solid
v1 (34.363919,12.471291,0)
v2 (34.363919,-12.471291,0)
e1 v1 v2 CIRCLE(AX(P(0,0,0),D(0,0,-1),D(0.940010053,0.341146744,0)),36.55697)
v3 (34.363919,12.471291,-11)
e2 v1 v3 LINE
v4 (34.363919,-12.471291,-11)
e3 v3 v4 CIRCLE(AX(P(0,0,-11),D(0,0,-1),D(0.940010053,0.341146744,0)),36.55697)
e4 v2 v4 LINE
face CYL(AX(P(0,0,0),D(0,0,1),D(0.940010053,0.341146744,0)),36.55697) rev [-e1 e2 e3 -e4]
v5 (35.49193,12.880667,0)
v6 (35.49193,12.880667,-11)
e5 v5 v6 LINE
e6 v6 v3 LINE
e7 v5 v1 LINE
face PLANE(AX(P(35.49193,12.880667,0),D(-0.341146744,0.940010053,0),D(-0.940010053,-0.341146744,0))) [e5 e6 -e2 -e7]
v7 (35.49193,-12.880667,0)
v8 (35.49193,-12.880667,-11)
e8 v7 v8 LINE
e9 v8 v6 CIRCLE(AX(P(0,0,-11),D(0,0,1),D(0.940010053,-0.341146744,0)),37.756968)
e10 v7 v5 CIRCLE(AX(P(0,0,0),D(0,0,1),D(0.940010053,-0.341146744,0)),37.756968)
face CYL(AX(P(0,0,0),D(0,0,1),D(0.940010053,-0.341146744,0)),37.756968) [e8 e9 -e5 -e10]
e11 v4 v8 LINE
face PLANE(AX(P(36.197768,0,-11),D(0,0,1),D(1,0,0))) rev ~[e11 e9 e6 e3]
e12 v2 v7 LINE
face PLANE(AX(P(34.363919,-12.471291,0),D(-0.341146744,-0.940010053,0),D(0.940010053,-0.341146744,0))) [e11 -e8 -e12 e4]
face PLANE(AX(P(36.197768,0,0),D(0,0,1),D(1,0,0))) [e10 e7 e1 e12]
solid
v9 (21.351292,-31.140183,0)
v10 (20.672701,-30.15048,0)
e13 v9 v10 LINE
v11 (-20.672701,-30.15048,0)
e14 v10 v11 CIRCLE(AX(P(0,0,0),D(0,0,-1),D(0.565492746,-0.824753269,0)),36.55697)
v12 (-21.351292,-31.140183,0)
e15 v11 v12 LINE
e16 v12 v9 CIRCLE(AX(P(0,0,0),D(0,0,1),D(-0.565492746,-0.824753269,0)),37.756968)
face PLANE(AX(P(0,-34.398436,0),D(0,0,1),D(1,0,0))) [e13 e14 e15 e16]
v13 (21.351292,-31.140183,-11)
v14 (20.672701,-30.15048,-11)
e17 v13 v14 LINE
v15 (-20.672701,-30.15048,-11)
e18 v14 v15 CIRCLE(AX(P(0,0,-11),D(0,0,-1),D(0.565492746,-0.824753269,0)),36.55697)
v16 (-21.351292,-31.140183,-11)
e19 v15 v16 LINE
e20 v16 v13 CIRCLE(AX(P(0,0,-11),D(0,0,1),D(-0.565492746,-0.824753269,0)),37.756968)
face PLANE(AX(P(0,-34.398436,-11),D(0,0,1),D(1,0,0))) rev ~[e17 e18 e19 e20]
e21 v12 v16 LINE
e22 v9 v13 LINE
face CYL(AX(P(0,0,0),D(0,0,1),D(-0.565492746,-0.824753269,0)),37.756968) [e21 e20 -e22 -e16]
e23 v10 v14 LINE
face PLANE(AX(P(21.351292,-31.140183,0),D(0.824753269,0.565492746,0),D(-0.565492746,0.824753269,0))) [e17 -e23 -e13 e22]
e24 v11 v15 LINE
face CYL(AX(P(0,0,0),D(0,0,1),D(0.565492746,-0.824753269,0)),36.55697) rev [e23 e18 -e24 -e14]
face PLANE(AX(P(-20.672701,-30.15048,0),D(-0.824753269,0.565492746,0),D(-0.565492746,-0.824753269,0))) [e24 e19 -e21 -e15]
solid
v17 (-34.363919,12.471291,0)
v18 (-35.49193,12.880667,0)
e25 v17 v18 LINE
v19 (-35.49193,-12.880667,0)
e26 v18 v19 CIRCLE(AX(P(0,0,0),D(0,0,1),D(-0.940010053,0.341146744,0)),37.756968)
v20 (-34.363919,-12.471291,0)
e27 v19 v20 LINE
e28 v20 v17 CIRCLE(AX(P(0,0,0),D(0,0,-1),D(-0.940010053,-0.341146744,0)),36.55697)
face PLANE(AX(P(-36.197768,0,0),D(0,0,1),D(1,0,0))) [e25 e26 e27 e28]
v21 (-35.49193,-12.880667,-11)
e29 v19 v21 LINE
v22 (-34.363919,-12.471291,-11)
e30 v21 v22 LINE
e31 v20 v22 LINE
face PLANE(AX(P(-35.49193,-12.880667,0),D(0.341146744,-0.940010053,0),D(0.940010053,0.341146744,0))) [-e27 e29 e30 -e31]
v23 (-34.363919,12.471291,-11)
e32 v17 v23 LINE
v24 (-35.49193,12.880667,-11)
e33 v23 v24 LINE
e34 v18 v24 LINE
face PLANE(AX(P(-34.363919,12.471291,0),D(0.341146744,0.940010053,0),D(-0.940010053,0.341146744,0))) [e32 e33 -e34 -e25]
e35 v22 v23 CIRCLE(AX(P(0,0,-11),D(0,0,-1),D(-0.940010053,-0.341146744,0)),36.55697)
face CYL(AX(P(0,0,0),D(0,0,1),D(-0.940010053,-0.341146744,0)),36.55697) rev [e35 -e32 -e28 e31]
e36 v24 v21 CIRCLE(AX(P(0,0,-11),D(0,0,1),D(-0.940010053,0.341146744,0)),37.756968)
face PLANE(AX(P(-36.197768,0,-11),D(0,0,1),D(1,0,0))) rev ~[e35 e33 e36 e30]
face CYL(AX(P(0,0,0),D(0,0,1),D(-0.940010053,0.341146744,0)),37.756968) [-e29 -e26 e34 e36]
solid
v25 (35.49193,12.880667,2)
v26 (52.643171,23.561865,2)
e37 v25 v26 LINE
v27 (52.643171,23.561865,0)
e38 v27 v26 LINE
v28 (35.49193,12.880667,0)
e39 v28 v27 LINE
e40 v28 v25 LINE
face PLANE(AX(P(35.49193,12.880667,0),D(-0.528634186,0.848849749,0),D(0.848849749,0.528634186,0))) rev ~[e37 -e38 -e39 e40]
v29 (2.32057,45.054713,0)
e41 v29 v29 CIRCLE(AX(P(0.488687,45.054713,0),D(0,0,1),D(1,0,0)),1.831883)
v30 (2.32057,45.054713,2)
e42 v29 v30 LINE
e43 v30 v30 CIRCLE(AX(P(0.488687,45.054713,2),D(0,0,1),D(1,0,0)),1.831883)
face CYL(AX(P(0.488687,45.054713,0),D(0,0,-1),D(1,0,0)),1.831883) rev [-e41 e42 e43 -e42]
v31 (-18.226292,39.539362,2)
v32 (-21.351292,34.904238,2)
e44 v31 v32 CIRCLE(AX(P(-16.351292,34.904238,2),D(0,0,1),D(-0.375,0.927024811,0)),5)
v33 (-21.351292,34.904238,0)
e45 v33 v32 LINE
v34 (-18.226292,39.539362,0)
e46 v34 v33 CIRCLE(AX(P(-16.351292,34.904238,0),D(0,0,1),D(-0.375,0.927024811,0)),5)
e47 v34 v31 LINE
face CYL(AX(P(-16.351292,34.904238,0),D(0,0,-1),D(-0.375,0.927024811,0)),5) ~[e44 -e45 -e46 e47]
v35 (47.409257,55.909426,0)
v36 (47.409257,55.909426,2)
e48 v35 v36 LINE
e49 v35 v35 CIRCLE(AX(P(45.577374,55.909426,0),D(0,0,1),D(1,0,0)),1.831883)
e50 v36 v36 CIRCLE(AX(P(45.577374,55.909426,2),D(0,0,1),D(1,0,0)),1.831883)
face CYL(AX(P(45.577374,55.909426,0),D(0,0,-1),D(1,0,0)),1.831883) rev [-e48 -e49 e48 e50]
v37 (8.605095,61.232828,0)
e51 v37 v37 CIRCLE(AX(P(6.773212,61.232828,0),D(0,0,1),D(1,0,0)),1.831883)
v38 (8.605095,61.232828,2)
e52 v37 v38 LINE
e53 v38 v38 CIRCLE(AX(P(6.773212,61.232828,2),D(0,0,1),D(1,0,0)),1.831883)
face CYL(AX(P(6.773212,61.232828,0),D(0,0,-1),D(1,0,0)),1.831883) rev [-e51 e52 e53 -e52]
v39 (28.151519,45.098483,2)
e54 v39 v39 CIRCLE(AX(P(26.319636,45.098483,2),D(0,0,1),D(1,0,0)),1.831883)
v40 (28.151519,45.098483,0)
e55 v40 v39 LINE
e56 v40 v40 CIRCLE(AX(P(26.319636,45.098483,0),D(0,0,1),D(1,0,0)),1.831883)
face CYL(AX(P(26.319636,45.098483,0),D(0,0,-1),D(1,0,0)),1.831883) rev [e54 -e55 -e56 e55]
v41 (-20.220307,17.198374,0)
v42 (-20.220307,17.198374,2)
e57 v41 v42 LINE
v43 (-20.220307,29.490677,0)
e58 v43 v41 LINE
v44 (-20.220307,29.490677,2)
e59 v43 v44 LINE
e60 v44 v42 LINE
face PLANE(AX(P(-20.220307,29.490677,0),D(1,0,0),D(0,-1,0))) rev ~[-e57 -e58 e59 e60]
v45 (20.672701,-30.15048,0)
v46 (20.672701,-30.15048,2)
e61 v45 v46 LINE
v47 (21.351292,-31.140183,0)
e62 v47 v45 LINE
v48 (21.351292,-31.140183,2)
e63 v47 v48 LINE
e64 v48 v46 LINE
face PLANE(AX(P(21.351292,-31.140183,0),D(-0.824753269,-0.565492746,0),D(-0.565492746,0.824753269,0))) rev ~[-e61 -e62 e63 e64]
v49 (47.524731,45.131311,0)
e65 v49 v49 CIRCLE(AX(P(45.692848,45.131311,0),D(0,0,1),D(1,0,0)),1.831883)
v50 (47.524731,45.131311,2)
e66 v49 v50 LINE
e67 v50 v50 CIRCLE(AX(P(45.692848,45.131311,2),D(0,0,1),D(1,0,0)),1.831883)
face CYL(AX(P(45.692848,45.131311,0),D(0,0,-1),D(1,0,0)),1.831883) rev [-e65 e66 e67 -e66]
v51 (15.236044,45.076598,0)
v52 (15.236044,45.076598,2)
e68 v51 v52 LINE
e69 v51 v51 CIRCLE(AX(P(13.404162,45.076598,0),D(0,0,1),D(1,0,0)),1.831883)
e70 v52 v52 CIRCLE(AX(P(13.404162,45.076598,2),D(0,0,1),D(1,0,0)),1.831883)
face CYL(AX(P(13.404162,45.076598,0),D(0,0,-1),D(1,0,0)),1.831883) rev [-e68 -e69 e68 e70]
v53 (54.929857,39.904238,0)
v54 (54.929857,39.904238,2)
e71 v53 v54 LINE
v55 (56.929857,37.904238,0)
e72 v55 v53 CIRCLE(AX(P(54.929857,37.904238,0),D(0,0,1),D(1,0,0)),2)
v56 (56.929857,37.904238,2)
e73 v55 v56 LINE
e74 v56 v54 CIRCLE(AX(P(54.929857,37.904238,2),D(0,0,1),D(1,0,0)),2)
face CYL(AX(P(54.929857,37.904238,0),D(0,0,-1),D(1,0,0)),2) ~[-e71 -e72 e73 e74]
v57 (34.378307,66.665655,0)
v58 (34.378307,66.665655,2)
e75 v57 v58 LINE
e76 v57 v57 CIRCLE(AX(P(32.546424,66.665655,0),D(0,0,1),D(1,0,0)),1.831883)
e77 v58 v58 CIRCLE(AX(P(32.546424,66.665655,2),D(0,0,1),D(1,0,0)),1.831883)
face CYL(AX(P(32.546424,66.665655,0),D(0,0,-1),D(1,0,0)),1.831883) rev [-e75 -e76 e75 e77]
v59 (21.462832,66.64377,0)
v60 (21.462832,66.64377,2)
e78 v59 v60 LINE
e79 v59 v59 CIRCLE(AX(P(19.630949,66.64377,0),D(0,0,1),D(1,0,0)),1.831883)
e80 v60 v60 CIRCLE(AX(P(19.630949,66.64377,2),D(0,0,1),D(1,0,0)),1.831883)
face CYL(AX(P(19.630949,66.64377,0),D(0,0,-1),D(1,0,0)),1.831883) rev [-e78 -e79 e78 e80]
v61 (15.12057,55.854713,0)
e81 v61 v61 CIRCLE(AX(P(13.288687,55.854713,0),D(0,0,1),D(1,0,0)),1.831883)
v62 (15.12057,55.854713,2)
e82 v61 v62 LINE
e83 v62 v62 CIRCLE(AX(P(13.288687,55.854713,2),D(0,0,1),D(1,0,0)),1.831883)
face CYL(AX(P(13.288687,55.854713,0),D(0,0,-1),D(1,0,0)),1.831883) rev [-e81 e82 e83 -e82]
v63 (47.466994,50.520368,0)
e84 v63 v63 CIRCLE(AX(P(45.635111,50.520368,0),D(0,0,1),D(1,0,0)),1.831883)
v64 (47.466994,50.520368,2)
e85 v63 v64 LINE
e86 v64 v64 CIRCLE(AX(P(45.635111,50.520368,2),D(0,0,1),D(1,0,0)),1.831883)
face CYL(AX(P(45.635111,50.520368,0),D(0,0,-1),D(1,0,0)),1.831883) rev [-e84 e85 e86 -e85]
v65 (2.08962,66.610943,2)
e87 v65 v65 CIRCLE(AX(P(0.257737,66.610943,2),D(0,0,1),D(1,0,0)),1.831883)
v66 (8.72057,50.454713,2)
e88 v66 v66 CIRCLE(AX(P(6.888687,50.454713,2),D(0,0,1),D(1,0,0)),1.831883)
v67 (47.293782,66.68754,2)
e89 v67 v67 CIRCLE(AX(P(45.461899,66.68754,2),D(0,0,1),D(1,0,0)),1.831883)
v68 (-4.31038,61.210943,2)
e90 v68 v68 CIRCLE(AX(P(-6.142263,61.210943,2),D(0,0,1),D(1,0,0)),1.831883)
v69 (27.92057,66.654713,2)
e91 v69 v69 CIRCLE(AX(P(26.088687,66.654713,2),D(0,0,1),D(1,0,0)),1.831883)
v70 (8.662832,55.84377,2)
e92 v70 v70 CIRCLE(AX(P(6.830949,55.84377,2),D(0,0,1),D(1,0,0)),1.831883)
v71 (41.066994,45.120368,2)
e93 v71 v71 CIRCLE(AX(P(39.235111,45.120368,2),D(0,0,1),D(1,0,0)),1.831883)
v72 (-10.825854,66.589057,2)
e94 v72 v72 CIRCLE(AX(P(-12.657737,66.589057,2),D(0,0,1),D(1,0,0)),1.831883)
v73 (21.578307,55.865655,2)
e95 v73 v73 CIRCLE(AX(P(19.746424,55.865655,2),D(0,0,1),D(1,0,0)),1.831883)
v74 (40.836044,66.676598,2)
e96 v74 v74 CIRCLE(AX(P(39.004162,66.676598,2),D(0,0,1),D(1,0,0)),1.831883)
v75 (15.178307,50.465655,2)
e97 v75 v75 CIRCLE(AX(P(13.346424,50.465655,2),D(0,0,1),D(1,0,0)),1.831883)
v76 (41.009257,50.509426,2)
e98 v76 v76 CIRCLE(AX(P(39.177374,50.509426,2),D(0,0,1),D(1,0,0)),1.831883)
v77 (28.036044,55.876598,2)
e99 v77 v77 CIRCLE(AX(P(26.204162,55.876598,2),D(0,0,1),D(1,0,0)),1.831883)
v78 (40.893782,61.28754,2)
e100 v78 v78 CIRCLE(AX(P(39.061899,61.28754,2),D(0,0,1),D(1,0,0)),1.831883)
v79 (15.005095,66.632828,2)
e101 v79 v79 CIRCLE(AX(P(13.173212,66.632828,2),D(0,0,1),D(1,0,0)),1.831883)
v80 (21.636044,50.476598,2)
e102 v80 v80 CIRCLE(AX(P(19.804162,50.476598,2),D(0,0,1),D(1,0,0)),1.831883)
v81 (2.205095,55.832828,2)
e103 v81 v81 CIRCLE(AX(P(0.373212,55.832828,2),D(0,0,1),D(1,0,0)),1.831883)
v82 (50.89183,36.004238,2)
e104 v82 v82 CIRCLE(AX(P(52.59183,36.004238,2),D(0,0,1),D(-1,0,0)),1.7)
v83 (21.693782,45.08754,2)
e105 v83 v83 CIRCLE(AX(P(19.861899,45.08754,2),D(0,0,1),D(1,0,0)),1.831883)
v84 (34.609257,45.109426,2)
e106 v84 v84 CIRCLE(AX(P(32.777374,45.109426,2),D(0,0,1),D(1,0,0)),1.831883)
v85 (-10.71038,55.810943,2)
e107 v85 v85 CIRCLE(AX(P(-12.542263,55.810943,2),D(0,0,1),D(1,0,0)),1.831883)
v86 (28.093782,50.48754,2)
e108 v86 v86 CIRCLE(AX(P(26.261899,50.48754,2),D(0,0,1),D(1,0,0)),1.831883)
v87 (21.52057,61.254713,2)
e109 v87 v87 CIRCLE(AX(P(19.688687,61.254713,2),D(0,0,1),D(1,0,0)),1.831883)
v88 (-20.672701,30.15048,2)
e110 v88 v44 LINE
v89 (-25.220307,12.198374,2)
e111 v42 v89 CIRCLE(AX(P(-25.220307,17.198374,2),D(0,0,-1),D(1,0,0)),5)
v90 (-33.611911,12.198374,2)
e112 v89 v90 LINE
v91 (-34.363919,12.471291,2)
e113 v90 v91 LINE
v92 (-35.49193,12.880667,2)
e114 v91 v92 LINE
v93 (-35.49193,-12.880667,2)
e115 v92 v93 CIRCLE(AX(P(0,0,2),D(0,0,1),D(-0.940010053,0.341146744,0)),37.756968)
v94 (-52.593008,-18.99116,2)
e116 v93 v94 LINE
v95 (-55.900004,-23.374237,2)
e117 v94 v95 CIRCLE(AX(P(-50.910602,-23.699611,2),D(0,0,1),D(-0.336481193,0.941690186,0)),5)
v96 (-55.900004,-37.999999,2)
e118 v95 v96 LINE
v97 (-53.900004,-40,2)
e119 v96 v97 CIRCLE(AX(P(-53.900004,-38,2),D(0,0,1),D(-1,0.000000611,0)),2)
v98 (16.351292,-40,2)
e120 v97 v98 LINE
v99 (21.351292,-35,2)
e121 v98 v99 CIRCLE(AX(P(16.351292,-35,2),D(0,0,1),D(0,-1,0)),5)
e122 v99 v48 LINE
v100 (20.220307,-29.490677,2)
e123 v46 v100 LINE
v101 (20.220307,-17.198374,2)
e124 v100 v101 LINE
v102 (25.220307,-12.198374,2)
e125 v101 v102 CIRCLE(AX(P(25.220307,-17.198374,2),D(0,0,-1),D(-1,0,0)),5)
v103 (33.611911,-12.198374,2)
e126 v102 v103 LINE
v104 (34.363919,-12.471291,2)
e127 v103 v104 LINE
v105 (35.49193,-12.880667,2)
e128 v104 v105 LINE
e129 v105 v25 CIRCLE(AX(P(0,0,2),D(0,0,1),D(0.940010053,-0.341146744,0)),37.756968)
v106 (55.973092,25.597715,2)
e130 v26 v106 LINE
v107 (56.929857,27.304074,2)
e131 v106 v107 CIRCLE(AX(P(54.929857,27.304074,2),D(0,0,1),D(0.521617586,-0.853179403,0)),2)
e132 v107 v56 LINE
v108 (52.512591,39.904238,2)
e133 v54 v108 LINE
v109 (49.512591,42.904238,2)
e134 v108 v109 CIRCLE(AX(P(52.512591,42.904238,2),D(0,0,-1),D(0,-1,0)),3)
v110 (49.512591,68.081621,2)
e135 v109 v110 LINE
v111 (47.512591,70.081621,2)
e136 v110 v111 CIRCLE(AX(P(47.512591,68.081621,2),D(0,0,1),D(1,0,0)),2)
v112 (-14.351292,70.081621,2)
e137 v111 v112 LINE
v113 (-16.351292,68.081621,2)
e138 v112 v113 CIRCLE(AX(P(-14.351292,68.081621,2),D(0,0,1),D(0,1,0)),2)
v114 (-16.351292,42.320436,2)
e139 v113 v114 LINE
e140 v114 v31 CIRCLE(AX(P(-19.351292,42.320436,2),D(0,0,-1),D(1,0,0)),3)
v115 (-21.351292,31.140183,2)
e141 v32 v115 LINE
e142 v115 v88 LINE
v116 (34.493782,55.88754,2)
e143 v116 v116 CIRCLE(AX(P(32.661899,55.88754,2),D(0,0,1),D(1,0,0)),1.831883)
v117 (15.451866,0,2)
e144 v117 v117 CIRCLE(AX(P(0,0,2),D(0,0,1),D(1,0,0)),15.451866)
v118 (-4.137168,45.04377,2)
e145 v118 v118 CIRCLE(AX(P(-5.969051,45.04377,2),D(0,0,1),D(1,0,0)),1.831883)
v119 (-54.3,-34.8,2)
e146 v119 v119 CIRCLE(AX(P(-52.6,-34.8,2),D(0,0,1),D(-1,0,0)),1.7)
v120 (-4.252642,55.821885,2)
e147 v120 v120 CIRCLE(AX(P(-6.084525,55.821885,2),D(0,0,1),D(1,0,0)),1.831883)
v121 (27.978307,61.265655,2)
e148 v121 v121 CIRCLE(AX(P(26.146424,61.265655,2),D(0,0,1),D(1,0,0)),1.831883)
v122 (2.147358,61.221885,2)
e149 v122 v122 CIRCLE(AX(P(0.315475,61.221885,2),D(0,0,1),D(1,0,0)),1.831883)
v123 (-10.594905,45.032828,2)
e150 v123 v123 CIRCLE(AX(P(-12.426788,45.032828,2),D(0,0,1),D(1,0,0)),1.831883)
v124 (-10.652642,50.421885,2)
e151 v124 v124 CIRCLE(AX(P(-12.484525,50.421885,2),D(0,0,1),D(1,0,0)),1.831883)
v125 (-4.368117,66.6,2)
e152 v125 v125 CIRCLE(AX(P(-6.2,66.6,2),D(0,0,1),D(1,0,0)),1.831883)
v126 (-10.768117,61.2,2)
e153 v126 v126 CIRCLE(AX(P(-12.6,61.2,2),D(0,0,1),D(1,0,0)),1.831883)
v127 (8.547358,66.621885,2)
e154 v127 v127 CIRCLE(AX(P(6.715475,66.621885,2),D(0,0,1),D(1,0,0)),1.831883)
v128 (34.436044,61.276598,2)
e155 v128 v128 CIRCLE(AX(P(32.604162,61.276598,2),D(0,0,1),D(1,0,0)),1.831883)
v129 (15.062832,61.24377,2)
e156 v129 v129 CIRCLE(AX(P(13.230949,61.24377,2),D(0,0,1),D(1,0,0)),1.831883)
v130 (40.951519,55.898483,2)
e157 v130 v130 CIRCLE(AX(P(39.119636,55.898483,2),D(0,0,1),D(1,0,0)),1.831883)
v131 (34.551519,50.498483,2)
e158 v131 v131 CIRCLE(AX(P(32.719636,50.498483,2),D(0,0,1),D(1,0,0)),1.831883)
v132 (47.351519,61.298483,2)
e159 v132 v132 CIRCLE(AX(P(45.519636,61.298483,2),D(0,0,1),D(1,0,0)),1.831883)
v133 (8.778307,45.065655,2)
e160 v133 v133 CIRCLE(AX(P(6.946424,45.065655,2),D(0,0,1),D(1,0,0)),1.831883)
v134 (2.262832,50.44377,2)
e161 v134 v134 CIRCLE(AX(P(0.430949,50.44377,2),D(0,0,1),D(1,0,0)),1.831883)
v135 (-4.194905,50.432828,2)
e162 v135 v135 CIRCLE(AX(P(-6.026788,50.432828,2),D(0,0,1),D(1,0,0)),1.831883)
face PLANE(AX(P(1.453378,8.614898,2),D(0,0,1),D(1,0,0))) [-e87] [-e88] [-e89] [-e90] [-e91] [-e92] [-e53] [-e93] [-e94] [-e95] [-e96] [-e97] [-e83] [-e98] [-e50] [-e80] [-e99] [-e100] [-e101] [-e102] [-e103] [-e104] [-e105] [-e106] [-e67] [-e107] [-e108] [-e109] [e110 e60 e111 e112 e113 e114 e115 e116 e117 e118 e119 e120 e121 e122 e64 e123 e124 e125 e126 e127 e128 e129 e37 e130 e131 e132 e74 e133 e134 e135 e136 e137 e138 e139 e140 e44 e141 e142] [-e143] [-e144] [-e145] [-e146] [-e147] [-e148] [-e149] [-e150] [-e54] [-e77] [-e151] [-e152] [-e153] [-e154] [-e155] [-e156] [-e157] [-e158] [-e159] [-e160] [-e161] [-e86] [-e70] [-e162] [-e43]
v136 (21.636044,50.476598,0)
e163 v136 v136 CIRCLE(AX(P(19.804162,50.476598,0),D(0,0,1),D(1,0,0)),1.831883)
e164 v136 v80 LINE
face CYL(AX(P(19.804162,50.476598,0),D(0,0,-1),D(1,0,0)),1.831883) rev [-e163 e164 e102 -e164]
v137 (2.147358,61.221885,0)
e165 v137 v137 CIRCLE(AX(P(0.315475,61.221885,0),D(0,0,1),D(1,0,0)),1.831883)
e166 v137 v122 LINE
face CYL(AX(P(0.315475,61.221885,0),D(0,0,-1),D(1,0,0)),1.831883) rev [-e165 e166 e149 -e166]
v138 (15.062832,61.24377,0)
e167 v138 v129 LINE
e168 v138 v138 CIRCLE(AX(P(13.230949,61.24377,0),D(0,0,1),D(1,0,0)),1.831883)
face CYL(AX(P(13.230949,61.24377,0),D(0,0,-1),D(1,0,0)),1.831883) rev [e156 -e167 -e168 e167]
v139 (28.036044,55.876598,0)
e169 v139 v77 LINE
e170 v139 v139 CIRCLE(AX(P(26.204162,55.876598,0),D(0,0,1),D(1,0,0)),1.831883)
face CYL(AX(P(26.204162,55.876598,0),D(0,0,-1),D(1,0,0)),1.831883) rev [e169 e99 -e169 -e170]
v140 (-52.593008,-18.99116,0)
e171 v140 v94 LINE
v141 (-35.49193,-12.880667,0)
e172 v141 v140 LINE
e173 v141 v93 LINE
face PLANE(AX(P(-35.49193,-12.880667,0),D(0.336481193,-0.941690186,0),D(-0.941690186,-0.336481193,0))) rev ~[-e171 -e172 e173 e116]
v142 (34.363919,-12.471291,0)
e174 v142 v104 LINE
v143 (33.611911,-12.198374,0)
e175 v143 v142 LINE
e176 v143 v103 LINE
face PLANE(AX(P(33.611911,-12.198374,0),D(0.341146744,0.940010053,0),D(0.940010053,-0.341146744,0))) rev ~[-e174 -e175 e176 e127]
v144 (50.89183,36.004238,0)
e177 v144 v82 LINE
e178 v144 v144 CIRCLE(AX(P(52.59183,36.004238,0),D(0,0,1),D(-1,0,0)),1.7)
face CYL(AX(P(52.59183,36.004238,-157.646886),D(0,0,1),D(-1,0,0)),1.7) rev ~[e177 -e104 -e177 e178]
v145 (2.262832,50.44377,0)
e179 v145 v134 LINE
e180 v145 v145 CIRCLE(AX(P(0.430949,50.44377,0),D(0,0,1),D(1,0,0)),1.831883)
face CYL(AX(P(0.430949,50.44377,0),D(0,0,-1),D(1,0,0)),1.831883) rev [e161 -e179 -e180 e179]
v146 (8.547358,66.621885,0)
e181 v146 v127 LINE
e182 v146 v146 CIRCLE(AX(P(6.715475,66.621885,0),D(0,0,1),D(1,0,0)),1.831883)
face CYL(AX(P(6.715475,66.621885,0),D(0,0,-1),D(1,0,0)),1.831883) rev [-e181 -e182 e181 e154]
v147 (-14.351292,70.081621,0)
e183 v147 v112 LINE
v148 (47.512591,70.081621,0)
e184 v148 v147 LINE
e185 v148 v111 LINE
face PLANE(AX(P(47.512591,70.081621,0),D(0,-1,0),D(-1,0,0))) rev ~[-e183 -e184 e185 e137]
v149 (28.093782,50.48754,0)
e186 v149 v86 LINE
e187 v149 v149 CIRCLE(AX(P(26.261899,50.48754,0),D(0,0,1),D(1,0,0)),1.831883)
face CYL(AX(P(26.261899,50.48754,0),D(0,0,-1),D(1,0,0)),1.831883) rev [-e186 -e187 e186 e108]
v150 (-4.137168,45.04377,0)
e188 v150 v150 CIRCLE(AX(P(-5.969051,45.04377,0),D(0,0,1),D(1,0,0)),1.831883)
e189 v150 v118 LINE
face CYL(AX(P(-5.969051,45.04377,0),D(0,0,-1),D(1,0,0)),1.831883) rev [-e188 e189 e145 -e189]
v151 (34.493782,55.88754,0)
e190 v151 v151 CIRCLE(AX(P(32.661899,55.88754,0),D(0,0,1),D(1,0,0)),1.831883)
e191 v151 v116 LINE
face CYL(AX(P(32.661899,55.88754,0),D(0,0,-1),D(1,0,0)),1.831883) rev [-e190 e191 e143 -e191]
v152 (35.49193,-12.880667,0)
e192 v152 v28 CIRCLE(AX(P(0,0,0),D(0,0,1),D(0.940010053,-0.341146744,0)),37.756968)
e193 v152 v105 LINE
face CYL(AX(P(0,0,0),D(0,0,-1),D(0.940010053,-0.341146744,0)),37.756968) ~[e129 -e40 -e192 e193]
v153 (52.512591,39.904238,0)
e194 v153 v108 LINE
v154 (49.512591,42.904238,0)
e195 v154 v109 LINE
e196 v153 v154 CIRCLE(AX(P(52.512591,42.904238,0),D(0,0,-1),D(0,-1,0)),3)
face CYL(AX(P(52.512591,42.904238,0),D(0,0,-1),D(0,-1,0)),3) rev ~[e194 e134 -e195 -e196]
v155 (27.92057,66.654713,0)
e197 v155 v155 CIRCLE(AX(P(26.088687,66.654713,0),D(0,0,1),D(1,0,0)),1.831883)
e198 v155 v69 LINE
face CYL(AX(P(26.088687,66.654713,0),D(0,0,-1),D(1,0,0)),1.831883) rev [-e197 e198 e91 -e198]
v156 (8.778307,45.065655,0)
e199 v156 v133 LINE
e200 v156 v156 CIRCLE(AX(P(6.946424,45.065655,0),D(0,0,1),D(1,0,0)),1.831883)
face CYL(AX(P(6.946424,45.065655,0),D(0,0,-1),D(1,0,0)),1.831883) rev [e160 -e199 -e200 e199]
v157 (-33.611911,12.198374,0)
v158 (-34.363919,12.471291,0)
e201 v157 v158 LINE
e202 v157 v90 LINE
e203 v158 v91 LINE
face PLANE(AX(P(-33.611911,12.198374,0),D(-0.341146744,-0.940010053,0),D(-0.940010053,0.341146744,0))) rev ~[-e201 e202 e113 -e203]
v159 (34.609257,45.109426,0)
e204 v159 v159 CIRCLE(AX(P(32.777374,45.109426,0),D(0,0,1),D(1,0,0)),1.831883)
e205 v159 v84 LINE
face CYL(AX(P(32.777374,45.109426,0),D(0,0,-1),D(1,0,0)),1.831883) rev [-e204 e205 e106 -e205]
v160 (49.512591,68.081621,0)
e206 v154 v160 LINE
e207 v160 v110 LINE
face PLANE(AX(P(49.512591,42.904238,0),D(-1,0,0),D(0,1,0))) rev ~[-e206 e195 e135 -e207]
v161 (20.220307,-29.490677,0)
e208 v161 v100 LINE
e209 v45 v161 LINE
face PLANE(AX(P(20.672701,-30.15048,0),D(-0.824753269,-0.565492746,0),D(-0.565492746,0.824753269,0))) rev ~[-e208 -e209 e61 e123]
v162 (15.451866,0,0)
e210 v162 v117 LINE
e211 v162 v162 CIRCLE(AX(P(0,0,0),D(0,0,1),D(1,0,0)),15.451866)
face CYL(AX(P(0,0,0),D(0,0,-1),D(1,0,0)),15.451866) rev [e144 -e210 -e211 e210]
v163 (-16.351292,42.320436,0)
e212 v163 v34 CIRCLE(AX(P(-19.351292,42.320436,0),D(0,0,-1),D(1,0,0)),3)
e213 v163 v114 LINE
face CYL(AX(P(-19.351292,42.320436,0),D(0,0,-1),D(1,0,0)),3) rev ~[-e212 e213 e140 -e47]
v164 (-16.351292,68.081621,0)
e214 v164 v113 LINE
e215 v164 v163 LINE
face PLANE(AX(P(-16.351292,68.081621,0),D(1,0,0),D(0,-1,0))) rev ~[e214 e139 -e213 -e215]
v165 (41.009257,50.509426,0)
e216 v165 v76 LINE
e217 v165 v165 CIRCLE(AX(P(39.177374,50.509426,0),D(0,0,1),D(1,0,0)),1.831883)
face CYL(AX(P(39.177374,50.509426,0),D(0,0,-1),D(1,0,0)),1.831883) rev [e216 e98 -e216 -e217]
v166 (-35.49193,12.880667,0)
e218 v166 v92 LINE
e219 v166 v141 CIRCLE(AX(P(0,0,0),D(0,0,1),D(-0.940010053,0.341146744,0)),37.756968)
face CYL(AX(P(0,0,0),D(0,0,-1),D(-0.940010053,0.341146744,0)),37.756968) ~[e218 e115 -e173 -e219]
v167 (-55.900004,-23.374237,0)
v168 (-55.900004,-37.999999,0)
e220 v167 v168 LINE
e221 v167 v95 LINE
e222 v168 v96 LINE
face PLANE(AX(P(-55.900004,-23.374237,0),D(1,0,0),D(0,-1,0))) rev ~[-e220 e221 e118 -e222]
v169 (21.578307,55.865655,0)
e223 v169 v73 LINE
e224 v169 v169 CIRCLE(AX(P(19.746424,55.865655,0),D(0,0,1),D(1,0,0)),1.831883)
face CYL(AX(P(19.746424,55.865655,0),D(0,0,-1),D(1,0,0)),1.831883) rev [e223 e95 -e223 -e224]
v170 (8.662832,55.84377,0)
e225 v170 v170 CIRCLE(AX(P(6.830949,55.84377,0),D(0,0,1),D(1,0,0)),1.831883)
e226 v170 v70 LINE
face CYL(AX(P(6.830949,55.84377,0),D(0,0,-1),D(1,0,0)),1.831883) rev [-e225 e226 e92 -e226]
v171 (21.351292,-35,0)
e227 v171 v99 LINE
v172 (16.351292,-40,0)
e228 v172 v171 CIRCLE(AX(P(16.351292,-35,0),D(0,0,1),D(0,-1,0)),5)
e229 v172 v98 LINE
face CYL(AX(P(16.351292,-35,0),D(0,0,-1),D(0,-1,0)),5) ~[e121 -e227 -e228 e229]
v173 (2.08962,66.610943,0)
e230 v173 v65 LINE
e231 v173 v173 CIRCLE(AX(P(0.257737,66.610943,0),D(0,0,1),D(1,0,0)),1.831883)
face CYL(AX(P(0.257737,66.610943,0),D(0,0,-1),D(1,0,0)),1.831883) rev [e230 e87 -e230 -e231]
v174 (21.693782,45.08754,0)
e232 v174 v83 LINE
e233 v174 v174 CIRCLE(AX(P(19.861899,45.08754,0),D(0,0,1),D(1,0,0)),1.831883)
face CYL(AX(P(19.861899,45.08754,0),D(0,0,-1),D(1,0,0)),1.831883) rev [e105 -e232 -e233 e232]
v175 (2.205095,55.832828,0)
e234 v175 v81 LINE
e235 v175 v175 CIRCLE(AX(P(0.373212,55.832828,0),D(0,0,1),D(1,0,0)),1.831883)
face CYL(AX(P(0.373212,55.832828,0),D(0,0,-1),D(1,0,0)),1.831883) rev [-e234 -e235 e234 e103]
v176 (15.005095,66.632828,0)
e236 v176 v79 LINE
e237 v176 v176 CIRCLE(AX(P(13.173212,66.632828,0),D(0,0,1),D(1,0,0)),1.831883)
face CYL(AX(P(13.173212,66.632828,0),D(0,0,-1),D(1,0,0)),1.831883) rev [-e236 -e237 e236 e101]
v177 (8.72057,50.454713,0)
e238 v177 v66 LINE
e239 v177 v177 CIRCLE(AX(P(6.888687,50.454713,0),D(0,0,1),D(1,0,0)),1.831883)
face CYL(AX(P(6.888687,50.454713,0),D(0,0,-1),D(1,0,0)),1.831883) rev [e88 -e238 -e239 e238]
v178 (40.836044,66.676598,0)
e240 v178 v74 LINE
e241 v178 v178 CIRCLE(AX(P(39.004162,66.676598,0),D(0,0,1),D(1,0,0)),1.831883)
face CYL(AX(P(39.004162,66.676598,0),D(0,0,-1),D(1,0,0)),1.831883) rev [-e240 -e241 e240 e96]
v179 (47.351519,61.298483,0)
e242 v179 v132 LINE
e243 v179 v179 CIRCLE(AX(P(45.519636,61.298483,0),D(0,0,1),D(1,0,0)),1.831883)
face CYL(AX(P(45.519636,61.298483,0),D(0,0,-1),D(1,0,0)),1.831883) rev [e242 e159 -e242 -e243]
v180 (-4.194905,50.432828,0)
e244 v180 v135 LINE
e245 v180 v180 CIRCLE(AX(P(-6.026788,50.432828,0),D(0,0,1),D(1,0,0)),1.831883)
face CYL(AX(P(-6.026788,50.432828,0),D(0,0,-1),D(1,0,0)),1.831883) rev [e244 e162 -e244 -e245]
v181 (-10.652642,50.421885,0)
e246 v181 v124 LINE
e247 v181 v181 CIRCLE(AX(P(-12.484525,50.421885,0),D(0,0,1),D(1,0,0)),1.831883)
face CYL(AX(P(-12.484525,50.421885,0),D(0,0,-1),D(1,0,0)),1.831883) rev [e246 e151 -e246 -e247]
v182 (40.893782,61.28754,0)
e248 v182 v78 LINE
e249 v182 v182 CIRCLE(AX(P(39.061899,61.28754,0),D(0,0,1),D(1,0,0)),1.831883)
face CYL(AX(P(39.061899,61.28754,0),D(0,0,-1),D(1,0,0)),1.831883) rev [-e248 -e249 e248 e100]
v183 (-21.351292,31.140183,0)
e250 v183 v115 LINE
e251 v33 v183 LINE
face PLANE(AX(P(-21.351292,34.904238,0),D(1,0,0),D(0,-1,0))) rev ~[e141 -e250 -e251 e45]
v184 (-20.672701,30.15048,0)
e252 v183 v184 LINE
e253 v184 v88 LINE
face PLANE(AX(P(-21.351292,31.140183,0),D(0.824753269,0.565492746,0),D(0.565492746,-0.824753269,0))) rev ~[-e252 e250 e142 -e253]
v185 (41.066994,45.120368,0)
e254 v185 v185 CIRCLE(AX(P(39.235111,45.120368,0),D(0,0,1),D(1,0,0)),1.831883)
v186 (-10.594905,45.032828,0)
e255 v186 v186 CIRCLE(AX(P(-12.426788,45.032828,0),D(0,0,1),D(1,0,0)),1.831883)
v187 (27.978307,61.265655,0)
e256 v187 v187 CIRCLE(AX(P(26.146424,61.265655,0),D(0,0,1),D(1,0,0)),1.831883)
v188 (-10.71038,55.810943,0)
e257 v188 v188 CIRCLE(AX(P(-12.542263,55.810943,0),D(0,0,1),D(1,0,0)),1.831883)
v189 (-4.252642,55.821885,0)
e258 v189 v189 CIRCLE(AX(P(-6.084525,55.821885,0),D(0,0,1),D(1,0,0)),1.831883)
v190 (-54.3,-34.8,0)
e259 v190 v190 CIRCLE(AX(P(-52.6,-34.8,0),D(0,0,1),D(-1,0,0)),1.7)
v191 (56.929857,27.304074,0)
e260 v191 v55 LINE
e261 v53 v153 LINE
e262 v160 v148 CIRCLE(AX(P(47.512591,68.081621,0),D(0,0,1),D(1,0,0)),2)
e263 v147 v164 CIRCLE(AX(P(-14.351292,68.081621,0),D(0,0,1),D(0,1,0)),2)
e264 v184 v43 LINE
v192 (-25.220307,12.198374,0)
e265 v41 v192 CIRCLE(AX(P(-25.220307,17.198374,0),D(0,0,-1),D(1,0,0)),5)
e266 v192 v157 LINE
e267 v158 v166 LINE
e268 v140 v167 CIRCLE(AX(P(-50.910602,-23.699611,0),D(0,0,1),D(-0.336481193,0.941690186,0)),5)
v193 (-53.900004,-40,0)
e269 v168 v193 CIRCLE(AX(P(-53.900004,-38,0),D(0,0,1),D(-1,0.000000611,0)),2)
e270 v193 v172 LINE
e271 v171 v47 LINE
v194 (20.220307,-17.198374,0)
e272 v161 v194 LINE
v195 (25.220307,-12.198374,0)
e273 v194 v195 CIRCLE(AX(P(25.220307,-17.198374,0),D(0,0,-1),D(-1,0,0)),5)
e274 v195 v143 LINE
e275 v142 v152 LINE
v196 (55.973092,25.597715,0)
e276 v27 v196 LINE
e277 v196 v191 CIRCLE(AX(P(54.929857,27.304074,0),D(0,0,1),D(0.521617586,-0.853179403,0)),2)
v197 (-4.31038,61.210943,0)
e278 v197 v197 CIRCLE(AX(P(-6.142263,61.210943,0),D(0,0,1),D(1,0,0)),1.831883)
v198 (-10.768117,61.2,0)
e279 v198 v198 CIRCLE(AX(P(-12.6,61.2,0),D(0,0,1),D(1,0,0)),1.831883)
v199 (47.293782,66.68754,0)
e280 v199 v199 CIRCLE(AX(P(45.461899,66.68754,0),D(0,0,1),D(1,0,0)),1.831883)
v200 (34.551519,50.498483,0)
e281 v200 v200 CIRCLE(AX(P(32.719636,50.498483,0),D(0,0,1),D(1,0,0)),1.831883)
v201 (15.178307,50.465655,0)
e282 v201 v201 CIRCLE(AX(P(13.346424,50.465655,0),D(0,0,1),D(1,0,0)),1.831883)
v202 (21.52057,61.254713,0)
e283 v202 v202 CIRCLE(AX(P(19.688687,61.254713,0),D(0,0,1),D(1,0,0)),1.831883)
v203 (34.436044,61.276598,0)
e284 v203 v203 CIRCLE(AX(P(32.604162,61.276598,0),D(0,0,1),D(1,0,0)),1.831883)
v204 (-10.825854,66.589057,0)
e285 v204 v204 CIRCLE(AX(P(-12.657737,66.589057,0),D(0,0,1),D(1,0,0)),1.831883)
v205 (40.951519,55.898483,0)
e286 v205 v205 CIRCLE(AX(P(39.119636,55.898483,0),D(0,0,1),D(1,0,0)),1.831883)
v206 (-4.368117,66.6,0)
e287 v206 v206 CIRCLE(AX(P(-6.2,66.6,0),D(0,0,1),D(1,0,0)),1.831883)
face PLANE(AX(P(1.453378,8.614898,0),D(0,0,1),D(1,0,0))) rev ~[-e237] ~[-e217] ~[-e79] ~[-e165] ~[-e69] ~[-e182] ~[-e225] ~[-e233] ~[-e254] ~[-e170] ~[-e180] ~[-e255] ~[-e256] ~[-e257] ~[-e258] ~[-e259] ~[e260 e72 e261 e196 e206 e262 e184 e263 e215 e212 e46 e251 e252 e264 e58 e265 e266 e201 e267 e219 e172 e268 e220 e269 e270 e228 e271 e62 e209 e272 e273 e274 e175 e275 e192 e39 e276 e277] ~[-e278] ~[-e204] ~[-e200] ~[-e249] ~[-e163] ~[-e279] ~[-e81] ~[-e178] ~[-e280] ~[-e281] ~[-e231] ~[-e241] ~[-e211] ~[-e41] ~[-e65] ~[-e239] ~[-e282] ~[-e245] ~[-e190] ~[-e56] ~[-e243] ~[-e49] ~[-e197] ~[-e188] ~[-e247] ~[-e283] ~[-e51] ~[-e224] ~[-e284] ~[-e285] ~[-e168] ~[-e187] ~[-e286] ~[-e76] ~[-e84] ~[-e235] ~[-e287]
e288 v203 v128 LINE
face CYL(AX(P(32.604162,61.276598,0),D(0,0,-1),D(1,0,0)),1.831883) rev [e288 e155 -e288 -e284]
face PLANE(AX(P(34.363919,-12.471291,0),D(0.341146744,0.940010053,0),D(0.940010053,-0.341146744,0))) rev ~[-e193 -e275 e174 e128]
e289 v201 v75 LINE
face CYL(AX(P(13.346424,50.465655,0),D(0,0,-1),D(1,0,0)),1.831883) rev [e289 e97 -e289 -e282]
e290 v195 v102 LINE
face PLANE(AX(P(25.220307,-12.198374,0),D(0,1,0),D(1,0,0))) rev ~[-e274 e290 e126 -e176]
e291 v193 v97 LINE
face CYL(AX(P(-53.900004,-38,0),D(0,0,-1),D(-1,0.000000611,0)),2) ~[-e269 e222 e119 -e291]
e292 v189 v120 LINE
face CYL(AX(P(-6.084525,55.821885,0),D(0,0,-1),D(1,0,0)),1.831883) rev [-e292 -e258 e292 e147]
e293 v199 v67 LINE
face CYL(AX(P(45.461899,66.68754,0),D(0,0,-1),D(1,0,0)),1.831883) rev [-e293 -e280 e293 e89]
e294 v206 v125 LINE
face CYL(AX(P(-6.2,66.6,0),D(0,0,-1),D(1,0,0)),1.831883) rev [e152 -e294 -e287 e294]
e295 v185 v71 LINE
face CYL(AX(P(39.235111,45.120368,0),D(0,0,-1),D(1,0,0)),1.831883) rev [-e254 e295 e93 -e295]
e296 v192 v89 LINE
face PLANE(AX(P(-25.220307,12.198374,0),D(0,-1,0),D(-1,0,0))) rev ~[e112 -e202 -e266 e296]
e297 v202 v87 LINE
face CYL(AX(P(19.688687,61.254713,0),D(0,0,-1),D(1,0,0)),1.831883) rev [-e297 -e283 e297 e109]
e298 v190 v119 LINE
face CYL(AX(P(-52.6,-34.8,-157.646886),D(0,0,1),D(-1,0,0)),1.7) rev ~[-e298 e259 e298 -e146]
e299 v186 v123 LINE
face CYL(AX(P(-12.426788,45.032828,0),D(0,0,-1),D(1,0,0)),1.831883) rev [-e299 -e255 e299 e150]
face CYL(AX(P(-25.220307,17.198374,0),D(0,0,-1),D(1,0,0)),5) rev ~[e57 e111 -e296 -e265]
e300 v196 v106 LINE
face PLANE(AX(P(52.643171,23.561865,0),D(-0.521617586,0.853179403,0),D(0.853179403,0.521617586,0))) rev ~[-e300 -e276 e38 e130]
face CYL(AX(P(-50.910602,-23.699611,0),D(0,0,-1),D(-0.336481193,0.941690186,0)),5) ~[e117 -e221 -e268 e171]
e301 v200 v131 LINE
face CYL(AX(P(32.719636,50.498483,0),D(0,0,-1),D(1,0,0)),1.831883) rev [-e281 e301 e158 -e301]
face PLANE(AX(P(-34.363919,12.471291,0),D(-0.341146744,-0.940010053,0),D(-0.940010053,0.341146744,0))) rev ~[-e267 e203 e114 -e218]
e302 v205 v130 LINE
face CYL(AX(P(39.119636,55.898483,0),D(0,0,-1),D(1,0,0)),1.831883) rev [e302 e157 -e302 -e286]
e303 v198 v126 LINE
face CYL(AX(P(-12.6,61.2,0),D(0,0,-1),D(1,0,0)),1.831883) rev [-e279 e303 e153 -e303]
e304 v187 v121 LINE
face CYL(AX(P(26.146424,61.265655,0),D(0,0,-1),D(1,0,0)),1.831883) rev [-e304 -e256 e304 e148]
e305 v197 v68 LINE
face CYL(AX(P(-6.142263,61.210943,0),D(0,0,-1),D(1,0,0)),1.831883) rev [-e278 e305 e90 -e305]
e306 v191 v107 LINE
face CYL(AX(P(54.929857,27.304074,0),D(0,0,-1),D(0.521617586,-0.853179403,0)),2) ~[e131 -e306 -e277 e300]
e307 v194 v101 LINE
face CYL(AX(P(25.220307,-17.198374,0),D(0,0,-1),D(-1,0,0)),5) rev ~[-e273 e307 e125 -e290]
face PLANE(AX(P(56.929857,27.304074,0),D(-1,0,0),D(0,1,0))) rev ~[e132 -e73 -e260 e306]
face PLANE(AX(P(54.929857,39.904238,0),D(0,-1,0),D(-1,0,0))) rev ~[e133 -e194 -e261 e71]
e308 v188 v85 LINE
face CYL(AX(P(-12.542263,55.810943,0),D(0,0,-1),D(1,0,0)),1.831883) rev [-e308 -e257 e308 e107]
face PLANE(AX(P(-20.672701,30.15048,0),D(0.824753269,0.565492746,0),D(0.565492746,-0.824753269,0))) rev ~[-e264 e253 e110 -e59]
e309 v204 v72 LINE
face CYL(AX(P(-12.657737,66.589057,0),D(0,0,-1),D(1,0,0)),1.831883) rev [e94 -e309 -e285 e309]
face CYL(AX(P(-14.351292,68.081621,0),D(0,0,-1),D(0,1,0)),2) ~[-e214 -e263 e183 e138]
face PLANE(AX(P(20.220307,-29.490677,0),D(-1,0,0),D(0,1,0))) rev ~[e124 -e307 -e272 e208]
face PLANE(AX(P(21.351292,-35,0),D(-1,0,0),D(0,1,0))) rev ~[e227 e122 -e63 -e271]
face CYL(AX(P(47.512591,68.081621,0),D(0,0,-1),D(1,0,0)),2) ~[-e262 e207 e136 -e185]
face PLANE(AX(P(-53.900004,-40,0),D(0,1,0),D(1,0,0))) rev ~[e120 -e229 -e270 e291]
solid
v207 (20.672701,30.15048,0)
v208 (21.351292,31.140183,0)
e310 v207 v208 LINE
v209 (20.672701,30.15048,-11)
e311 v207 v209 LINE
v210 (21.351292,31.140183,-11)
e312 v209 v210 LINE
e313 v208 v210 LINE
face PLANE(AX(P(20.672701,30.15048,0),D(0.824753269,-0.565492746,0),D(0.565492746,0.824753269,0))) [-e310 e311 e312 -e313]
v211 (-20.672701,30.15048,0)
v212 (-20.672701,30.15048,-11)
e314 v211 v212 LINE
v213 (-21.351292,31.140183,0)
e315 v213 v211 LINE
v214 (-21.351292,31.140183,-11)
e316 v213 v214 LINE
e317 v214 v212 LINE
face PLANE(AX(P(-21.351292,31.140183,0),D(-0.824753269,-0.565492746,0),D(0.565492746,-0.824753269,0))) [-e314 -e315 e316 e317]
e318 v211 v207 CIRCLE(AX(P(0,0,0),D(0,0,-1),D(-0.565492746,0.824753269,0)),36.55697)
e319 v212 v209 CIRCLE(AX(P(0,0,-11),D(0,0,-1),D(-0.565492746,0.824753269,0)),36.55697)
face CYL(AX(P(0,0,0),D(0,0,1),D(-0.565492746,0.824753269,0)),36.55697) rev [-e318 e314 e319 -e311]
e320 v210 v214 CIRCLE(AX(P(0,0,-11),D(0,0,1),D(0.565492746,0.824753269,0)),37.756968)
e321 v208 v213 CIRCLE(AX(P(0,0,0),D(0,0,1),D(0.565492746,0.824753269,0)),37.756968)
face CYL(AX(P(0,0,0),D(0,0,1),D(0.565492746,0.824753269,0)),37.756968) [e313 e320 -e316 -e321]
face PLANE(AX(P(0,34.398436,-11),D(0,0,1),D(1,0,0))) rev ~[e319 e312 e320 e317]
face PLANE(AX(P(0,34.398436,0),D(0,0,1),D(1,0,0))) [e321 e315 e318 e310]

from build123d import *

# Parameters (mm, degrees)
F1_DEPTH = 11
F0_R     = 15.4518658469
F0_R_2   = 1.8318829632
F2_DEPTH = 2
F3_D     = 3.4


with BuildPart() as f1:
    # F0 (on Top) → F1 (new body)
    with BuildSketch(Plane.XY):
        with BuildLine():
            ThreePointArc((35.4919297455, -12.880666806), (37.7569682896, 0), (35.4919297455, 12.880666806))
            Line((35.4919297455, 12.880666806), (34.3639188223, 12.4712911265))
            ThreePointArc((34.3639188223, 12.4712911265), (36.5569695023, 0), (34.3639188223, -12.4712911265))
            Line((34.3639188223, -12.4712911265), (35.4919297455, -12.880666806))
        make_face()
    extrude(amount=-F1_DEPTH)


with BuildPart() as f1b:
    # F0 (on Top) → F1, piece 2 (new body)
    with BuildSketch(Plane.XY):
        with BuildLine():
            ThreePointArc((21.3512916707, 31.1401830183), (0, 37.7569682896), (-21.3512916707, 31.1401830183))
            Line((-21.3512916707, 31.1401830183), (-20.6727010615, 30.1504800959))
            ThreePointArc((-20.6727010615, 30.1504800959), (0, 36.5569695023), (20.6727010615, 30.1504800959))
            Line((20.6727010615, 30.1504800959), (21.3512916707, 31.1401830183))
        make_face()
    extrude(amount=-F1_DEPTH)


with BuildPart() as f1c:
    # F0 (on Top) → F1, piece 3 (new body)
    with BuildSketch(Plane.XY):
        with BuildLine():
            Line((21.3512916707, -31.1401830183), (20.6727010615, -30.1504800959))
            ThreePointArc((20.6727010615, -30.1504800959), (0, -36.5569695023), (-20.6727010615, -30.1504800959))
            Line((-20.6727010615, -30.1504800959), (-21.3512916707, -31.1401830183))
            ThreePointArc((-21.3512916707, -31.1401830183), (0, -37.7569682896), (21.3512916707, -31.1401830183))
        make_face()
    extrude(amount=-F1_DEPTH)


with BuildPart() as f1d:
    # F0 (on Top) → F1, piece 4 (new body)
    with BuildSketch(Plane.XY):
        with BuildLine():
            ThreePointArc((-34.3639188223, -12.4712911265), (-36.5569695023, 0), (-34.3639188223, 12.4712911265))
            Line((-34.3639188223, 12.4712911265), (-35.4919297455, 12.880666806))
            ThreePointArc((-35.4919297455, 12.880666806), (-37.7569682896, 0), (-35.4919297455, -12.880666806))
            Line((-35.4919297455, -12.880666806), (-34.3639188223, -12.4712911265))
        make_face()
    extrude(amount=-F1_DEPTH)


with BuildPart() as f2:
    # F0 (on Top) → F2 (new body)
    with BuildSketch(Plane.XY):
        with BuildLine():
            Line((54.3673303405, 39.9042378306), (52.512591213, 39.9042378306))
            ThreePointArc((52.512591213, 39.9042378306), (50.3912708694, 40.7829174871), (49.512591213, 42.9042378306))
            Line((49.512591213, 42.9042378306), (49.512591213, 68.0816214085))
            ThreePointArc((49.512591213, 68.0816214085), (48.9268047754, 69.4958349708), (47.512591213, 70.0816214085))
            Line((47.512591213, 70.0816214085), (-14.3512916707, 70.0816214085))
            ThreePointArc((-14.3512916707, 70.0816214085), (-15.7655052331, 69.4958349708), (-16.3512916707, 68.0816214085))
            Line((-16.3512916707, 68.0816214085), (-16.3512916707, 42.3204363177))
            ThreePointArc((-16.3512916707, 42.3204363177), (-16.863823078, 40.6433853346), (-18.2262916707, 39.5393618851))
            ThreePointArc((-18.2262916707, 39.5393618851), (-20.4970726587, 37.6993228025), (-21.3512916707, 34.9042378306))
            Line((-21.3512916707, 34.9042378306), (-21.3512916707, 31.1401830183))
            ThreePointArc((-21.3512916707, 31.1401830183), (0, 37.7569682896), (21.3512916707, 31.1401830183))
            Line((21.3512916707, 31.1401830183), (20.6727010615, 30.1504800959))
            ThreePointArc((20.6727010615, 30.1504800959), (0, 36.5569695023), (-20.6727010615, 30.1504800959))
            Line((-20.6727010615, 30.1504800959), (-20.2203068649, 29.4906774808))
            Line((-20.2203068649, 29.4906774808), (-20.2203068649, 17.1983737311))
            ThreePointArc((-20.2203068649, 17.1983737311), (-21.684772959, 13.6628398252), (-25.2203068649, 12.1983737311))
            Line((-25.2203068649, 12.1983737311), (-33.6119107803, 12.1983737311))
            Line((-33.6119107803, 12.1983737311), (-34.3639188223, 12.4712911265))
            ThreePointArc((-34.3639188223, 12.4712911265), (-36.5569695023, 0), (-34.3639188223, -12.4712911265))
            Line((-34.3639188223, -12.4712911265), (-35.4919297455, -12.880666806))
            Line((-35.4919297455, -12.880666806), (-52.5930077846, -18.9911596472))
            ThreePointArc((-52.5930077846, -18.9911596472), (-54.9019795203, -20.6881484667), (-55.9000037611, -23.3742365413))
            Line((-55.9000037611, -23.3742365413), (-55.9000037611, -37.9999987781))
            ThreePointArc((-55.9000037611, -37.9999987781), (-55.3142177554, -39.4142131304), (-53.9000037611, -40))
            Line((-53.9000037611, -40), (16.3512916707, -40))
            ThreePointArc((16.3512916707, -40), (19.8868255767, -38.5355339059), (21.3512916707, -35))
            Line((21.3512916707, -35), (21.3512916707, -31.1401830183))
            ThreePointArc((21.3512916707, -31.1401830183), (0, -37.7569682896), (-21.3512916707, -31.1401830183))
            Line((-21.3512916707, -31.1401830183), (-20.6727010615, -30.1504800959))
            ThreePointArc((-20.6727010615, -30.1504800959), (0, -36.5569695023), (20.6727010615, -30.1504800959))
            Line((20.6727010615, -30.1504800959), (20.2203068649, -29.4906774808))
            Line((20.2203068649, -29.4906774808), (20.2203068649, -17.1983737311))
            ThreePointArc((20.2203068649, -17.1983737311), (21.684772959, -13.6628398252), (25.2203068649, -12.1983737311))
            Line((25.2203068649, -12.1983737311), (33.6119107803, -12.1983737311))
            Line((33.6119107803, -12.1983737311), (34.3639188223, -12.4712911265))
            ThreePointArc((34.3639188223, -12.4712911265), (36.5569695023, 0), (34.3639188223, 12.4712911265))
            Line((34.3639188223, 12.4712911265), (35.4919297455, 12.880666806))
            Line((35.4919297455, 12.880666806), (52.6431709313, 23.5618650201))
            Line((52.6431709313, 23.5618650201), (55.9730917101, 25.5977149601))
            ThreePointArc((55.9730917101, 25.5977149601), (56.6743436185, 26.3259302045), (56.9298565388, 27.3040737668))
            Line((56.9298565388, 27.3040737668), (56.9298565388, 37.9042378306))
            ThreePointArc((56.9298565388, 37.9042378306), (56.3440701011, 39.318451393), (54.9298565388, 39.9042378306))
            Line((54.9298565388, 39.9042378306), (54.3673303405, 39.9042378306))
        make_face()
        Circle(F0_R, mode=Mode.SUBTRACT)
        with Locations((-12.4267879218, 45.0328276634)):
            Circle(F0_R_2, mode=Mode.SUBTRACT)
        with Locations((-5.9690505624, 45.0437702179)):
            Circle(F0_R_2, mode=Mode.SUBTRACT)
        with Locations((0.488686797, 45.0547127724)):
            Circle(F0_R_2, mode=Mode.SUBTRACT)
        with Locations((-12.4845252812, 50.4218851089)):
            Circle(F0_R_2, mode=Mode.SUBTRACT)
        with Locations((-12.5422626406, 55.8109425545)):
            Circle(F0_R_2, mode=Mode.SUBTRACT)
        with Locations((-6.0267879218, 50.4328276634)):
            Circle(F0_R_2, mode=Mode.SUBTRACT)
        with Locations((0.4309494376, 50.4437702179)):
            Circle(F0_R_2, mode=Mode.SUBTRACT)
        with Locations((-6.0845252812, 55.8218851089)):
            Circle(F0_R_2, mode=Mode.SUBTRACT)
        with Locations((0.3732120782, 55.8328276634)):
            Circle(F0_R_2, mode=Mode.SUBTRACT)
        with Locations((-12.6, 61.2)):
            Circle(F0_R_2, mode=Mode.SUBTRACT)
        with Locations((-6.1422626406, 61.2109425545)):
            Circle(F0_R_2, mode=Mode.SUBTRACT)
        with Locations((0.3154747188, 61.2218851089)):
            Circle(F0_R_2, mode=Mode.SUBTRACT)
        with Locations((-12.6577373594, 66.5890574455)):
            Circle(F0_R_2, mode=Mode.SUBTRACT)
        with Locations((-6.2, 66.6)):
            Circle(F0_R_2, mode=Mode.SUBTRACT)
        with Locations((0.2577373594, 66.6109425545)):
            Circle(F0_R_2, mode=Mode.SUBTRACT)
        with Locations((6.9464241564, 45.0656553268)):
            Circle(F0_R_2, mode=Mode.SUBTRACT)
        with Locations((13.4041615158, 45.0765978813)):
            Circle(F0_R_2, mode=Mode.SUBTRACT)
        with Locations((6.888686797, 50.4547127724)):
            Circle(F0_R_2, mode=Mode.SUBTRACT)
        with Locations((6.8309494376, 55.8437702179)):
            Circle(F0_R_2, mode=Mode.SUBTRACT)
        with Locations((13.3464241564, 50.4656553268)):
            Circle(F0_R_2, mode=Mode.SUBTRACT)
        with Locations((13.288686797, 55.8547127724)):
            Circle(F0_R_2, mode=Mode.SUBTRACT)
        with Locations((19.8618988752, 45.0875404358)):
            Circle(F0_R_2, mode=Mode.SUBTRACT)
        with Locations((26.3196362346, 45.0984829903)):
            Circle(F0_R_2, mode=Mode.SUBTRACT)
        with Locations((19.8041615158, 50.4765978813)):
            Circle(F0_R_2, mode=Mode.SUBTRACT)
        with Locations((19.7464241564, 55.8656553268)):
            Circle(F0_R_2, mode=Mode.SUBTRACT)
        with Locations((26.2618988752, 50.4875404358)):
            Circle(F0_R_2, mode=Mode.SUBTRACT)
        with Locations((26.2041615158, 55.8765978813)):
            Circle(F0_R_2, mode=Mode.SUBTRACT)
        with Locations((6.7732120782, 61.2328276634)):
            Circle(F0_R_2, mode=Mode.SUBTRACT)
        with Locations((13.2309494376, 61.2437702179)):
            Circle(F0_R_2, mode=Mode.SUBTRACT)
        with Locations((6.7154747188, 66.6218851089)):
            Circle(F0_R_2, mode=Mode.SUBTRACT)
        with Locations((13.1732120782, 66.6328276634)):
            Circle(F0_R_2, mode=Mode.SUBTRACT)
        with Locations((19.688686797, 61.2547127724)):
            Circle(F0_R_2, mode=Mode.SUBTRACT)
        with Locations((26.1464241564, 61.2656553268)):
            Circle(F0_R_2, mode=Mode.SUBTRACT)
        with Locations((19.6309494376, 66.6437702179)):
            Circle(F0_R_2, mode=Mode.SUBTRACT)
        with Locations((26.088686797, 66.6547127724)):
            Circle(F0_R_2, mode=Mode.SUBTRACT)
        with Locations((32.777373594, 45.1094255447)):
            Circle(F0_R_2, mode=Mode.SUBTRACT)
        with Locations((39.2351109535, 45.1203680992)):
            Circle(F0_R_2, mode=Mode.SUBTRACT)
        with Locations((32.7196362346, 50.4984829903)):
            Circle(F0_R_2, mode=Mode.SUBTRACT)
        with Locations((32.6618988752, 55.8875404358)):
            Circle(F0_R_2, mode=Mode.SUBTRACT)
        with Locations((39.177373594, 50.5094255447)):
            Circle(F0_R_2, mode=Mode.SUBTRACT)
        with Locations((39.1196362346, 55.8984829903)):
            Circle(F0_R_2, mode=Mode.SUBTRACT)
        with Locations((45.6928483129, 45.1313106537)):
            Circle(F0_R_2, mode=Mode.SUBTRACT)
        with Locations((45.6351109535, 50.5203680992)):
            Circle(F0_R_2, mode=Mode.SUBTRACT)
        with Locations((45.577373594, 55.9094255447)):
            Circle(F0_R_2, mode=Mode.SUBTRACT)
        with Locations((32.6041615158, 61.2765978813)):
            Circle(F0_R_2, mode=Mode.SUBTRACT)
        with Locations((39.0618988752, 61.2875404358)):
            Circle(F0_R_2, mode=Mode.SUBTRACT)
        with Locations((32.5464241564, 66.6656553268)):
            Circle(F0_R_2, mode=Mode.SUBTRACT)
        with Locations((39.0041615158, 66.6765978813)):
            Circle(F0_R_2, mode=Mode.SUBTRACT)
        with Locations((45.5196362346, 61.2984829903)):
            Circle(F0_R_2, mode=Mode.SUBTRACT)
        with Locations((45.4618988752, 66.6875404358)):
            Circle(F0_R_2, mode=Mode.SUBTRACT)
        with BuildLine():
            ThreePointArc((35.4919297455, -12.880666806), (37.7569682896, 0), (35.4919297455, 12.880666806))
            Line((35.4919297455, 12.880666806), (34.3639188223, 12.4712911265))
            ThreePointArc((34.3639188223, 12.4712911265), (36.5569695023, 0), (34.3639188223, -12.4712911265))
            Line((34.3639188223, -12.4712911265), (35.4919297455, -12.880666806))
        make_face()
        with BuildLine():
            ThreePointArc((21.3512916707, 31.1401830183), (0, 37.7569682896), (-21.3512916707, 31.1401830183))
            Line((-21.3512916707, 31.1401830183), (-20.6727010615, 30.1504800959))
            ThreePointArc((-20.6727010615, 30.1504800959), (0, 36.5569695023), (20.6727010615, 30.1504800959))
            Line((20.6727010615, 30.1504800959), (21.3512916707, 31.1401830183))
        make_face()
        with BuildLine():
            Line((21.3512916707, -31.1401830183), (20.6727010615, -30.1504800959))
            ThreePointArc((20.6727010615, -30.1504800959), (0, -36.5569695023), (-20.6727010615, -30.1504800959))
            Line((-20.6727010615, -30.1504800959), (-21.3512916707, -31.1401830183))
            ThreePointArc((-21.3512916707, -31.1401830183), (0, -37.7569682896), (21.3512916707, -31.1401830183))
        make_face()
        with BuildLine():
            ThreePointArc((-34.3639188223, -12.4712911265), (-36.5569695023, 0), (-34.3639188223, 12.4712911265))
            Line((-34.3639188223, 12.4712911265), (-35.4919297455, 12.880666806))
            ThreePointArc((-35.4919297455, 12.880666806), (-37.7569682896, 0), (-35.4919297455, -12.880666806))
            Line((-35.4919297455, -12.880666806), (-34.3639188223, -12.4712911265))
        make_face()
    extrude(amount=F2_DEPTH)

    # F3 (through all)
    with Locations(Plane(origin=(0, 0, 0), x_dir=(1, 0, 0), z_dir=(0, 0, -1))):
        with Locations((52.5918301404, -36.0042378306), (-52.6, 34.8)):
            Hole(F3_D / 2)


solid = Compound([f1.part, f1b.part, f1c.part, f1d.part, f2.part])
